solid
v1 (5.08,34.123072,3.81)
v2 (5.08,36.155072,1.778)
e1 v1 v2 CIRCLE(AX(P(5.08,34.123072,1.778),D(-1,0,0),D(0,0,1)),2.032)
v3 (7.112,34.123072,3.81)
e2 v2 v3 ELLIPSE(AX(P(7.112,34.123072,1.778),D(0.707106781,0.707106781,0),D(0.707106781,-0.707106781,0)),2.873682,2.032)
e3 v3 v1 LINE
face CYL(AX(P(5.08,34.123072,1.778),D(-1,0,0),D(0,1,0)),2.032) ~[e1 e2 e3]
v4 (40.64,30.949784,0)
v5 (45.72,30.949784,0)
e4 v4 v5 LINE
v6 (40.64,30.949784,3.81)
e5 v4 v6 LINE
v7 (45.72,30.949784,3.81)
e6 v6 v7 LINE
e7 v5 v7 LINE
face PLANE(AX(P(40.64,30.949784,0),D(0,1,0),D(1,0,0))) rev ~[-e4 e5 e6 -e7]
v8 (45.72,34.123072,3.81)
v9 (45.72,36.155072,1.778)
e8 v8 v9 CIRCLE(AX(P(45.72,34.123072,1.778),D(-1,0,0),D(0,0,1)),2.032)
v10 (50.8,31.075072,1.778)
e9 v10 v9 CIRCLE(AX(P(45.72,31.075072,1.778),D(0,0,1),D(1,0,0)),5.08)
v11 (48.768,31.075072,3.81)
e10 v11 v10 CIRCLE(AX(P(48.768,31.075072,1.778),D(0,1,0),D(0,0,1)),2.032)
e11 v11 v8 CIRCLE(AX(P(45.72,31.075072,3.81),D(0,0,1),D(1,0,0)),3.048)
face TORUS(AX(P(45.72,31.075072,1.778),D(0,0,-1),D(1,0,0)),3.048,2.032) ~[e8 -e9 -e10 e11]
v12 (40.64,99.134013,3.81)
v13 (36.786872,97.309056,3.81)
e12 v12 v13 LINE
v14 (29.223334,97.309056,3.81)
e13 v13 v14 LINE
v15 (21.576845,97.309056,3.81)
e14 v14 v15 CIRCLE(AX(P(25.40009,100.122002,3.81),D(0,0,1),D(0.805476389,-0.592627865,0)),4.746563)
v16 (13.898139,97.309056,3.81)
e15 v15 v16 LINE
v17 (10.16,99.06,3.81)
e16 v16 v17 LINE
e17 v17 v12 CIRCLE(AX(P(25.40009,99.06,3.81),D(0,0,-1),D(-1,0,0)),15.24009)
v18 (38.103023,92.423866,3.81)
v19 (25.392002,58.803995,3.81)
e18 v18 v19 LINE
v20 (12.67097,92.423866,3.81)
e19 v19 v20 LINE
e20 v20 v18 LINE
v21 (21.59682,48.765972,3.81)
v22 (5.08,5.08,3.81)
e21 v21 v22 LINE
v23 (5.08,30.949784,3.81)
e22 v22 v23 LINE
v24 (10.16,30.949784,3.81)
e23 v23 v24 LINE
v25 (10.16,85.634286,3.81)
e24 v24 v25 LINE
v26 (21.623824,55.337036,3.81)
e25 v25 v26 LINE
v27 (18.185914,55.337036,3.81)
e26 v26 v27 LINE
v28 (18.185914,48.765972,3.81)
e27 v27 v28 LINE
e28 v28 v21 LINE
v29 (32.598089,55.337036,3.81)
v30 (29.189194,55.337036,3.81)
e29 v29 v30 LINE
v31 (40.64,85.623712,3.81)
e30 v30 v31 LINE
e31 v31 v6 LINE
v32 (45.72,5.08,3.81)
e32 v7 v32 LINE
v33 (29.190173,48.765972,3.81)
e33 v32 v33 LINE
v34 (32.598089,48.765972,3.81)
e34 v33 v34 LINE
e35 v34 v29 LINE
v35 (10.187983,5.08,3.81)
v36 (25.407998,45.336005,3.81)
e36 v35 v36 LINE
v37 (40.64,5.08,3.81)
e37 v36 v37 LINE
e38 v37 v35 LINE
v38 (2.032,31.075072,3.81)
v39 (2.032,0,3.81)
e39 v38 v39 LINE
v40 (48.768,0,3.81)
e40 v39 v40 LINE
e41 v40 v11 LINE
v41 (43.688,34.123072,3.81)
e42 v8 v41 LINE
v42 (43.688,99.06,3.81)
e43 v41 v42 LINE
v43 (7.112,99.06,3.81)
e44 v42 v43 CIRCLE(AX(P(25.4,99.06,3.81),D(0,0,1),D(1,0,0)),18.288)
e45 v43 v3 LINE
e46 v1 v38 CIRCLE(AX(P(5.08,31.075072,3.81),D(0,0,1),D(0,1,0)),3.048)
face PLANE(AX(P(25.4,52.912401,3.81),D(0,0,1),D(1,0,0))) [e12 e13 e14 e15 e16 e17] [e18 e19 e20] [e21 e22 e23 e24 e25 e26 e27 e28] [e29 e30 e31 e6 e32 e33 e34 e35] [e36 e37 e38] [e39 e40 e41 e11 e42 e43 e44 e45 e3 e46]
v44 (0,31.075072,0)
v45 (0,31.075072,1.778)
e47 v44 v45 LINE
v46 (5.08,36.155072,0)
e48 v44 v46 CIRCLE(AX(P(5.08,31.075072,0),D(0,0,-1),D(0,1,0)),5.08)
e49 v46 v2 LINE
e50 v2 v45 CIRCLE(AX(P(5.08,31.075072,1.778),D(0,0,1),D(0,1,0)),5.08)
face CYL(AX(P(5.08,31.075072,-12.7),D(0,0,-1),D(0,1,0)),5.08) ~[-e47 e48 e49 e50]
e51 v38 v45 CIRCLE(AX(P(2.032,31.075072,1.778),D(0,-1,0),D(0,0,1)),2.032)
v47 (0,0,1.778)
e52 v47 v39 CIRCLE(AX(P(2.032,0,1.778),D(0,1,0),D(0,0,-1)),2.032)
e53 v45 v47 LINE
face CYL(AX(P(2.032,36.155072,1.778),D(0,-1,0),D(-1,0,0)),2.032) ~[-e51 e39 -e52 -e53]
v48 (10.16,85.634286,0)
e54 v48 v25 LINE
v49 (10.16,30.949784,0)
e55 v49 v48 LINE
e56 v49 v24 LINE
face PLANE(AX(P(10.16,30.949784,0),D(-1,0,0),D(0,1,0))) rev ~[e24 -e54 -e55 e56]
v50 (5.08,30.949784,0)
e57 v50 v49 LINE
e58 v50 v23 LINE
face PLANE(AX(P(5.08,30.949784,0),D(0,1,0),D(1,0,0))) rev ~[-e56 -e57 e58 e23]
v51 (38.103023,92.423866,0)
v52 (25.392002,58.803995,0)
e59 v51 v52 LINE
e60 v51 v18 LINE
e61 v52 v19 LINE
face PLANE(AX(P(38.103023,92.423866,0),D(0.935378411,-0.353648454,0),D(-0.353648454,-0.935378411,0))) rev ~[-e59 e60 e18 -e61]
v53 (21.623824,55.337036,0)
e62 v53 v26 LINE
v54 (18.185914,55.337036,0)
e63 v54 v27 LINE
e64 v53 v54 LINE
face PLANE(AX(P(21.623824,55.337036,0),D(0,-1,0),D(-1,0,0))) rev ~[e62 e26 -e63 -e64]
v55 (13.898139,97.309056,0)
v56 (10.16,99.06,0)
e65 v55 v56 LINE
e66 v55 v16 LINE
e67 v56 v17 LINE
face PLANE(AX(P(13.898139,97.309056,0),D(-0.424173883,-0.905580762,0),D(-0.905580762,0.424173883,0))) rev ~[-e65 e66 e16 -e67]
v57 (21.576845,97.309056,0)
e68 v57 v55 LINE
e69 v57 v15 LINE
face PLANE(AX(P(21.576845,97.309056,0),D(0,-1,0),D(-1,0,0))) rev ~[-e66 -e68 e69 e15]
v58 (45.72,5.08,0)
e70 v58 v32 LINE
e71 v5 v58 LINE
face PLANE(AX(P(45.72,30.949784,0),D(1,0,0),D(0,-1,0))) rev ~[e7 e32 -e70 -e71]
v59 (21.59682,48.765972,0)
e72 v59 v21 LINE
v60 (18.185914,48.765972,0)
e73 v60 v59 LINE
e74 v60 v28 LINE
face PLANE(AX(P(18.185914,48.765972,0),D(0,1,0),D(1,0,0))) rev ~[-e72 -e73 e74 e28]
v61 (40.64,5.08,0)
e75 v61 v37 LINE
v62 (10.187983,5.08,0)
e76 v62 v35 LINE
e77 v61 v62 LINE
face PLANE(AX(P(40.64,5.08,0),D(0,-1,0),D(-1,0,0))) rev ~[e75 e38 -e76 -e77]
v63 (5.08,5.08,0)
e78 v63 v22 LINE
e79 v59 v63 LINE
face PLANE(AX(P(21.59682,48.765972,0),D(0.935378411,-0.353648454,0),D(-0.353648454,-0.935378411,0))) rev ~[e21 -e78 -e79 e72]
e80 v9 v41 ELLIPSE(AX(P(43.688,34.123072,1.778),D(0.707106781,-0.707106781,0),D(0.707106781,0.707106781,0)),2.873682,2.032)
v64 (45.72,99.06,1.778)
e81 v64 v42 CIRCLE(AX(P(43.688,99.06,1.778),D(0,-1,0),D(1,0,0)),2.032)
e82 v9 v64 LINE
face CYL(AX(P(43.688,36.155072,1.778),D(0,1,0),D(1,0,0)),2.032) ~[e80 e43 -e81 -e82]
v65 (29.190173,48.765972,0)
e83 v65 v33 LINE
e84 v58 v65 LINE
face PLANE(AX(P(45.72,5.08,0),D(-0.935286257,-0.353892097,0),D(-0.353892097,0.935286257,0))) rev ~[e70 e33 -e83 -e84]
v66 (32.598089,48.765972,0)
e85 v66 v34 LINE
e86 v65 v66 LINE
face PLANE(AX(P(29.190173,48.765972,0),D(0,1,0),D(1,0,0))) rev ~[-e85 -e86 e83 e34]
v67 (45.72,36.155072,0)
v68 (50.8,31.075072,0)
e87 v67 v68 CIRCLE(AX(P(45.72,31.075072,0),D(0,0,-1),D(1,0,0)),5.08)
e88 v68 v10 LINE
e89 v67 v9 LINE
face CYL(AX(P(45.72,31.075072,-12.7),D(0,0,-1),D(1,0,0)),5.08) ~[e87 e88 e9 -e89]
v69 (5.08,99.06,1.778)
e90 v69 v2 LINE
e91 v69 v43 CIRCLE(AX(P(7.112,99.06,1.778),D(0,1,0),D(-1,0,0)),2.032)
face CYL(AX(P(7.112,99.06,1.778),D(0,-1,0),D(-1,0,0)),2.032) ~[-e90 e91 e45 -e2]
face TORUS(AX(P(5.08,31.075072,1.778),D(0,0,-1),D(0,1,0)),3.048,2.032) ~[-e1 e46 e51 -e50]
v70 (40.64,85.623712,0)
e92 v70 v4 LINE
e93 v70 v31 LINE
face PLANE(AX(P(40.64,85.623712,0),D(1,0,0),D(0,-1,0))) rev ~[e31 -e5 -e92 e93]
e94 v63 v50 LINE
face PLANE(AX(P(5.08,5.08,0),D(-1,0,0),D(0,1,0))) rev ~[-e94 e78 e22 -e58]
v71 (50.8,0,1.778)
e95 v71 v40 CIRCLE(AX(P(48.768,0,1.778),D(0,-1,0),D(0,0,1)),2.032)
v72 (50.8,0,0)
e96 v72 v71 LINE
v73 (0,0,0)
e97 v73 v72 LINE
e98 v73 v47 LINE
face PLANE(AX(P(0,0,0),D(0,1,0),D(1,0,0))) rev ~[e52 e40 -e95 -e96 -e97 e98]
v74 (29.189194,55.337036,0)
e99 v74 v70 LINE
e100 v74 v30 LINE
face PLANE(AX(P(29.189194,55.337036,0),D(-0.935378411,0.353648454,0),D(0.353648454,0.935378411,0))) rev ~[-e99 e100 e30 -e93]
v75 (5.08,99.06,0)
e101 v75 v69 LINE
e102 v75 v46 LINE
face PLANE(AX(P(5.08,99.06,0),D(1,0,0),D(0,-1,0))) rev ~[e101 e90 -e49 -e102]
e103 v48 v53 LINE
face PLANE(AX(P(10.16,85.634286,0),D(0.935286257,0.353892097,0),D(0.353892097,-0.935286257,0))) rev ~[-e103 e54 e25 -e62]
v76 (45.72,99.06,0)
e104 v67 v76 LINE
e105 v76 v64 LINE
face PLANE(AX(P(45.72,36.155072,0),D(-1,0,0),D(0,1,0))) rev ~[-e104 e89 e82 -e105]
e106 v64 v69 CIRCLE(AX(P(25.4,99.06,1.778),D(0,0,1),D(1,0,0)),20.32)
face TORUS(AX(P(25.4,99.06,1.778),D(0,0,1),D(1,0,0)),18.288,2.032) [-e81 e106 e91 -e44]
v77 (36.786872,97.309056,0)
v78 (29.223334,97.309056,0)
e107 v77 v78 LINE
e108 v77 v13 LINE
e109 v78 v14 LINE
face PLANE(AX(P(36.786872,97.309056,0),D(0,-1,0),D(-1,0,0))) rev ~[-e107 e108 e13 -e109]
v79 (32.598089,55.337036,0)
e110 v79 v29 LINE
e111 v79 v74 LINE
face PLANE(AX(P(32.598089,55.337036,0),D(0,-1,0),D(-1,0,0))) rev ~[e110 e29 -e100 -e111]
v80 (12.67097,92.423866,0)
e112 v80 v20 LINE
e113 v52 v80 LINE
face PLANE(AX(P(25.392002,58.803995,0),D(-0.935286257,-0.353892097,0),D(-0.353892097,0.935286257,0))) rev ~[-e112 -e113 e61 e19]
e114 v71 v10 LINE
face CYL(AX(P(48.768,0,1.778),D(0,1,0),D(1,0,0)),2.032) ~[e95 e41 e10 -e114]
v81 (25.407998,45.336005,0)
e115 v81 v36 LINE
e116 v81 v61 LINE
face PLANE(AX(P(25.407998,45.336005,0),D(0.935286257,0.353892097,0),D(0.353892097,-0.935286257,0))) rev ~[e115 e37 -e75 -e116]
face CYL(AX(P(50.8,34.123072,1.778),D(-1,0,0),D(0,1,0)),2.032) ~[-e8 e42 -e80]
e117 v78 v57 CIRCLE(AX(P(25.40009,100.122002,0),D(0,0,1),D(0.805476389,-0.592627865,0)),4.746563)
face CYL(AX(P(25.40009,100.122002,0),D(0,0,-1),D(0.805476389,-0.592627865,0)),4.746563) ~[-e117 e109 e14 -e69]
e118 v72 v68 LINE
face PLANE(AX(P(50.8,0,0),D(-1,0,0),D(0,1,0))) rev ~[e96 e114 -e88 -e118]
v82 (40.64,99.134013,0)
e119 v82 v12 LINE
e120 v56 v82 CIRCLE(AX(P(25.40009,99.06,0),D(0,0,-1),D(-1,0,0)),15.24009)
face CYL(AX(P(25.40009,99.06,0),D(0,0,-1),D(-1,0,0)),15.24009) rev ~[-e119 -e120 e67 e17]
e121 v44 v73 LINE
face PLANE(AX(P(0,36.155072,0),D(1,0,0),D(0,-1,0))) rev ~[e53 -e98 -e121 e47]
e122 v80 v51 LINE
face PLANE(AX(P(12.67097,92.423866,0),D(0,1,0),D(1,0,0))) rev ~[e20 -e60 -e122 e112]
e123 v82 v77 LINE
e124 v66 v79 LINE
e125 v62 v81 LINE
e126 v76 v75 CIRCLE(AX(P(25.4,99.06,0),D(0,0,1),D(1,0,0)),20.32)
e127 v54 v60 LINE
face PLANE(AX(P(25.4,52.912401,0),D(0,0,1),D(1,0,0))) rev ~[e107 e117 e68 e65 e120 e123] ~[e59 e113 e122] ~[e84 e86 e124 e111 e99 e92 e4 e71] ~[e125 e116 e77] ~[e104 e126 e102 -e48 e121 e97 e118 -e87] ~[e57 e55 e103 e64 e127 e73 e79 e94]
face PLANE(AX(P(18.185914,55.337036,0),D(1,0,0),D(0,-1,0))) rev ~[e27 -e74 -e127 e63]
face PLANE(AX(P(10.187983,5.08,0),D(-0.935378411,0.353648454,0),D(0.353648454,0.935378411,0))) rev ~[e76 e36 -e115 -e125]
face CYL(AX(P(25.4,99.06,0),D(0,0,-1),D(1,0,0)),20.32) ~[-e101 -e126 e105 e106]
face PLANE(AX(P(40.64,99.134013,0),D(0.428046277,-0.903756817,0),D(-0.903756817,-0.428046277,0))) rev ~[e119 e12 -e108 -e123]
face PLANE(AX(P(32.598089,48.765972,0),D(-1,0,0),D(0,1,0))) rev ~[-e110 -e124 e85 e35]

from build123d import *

# Parameters (mm, degrees)
F1_DEPTH     = 3.81
F2_R         = 2.032
F3_T3_ANGLE  = 90
F3_T6_ANGLE  = 90
F3_T9_DEPTH  = 16.51
F3_T12_DEPTH = 16.51


# Not quite as in the source:
# - a fillet or chamfer that OpenCascade refuses, or shapes differently, is made with other operations: its cross-section is extruded or revolved along the edge and cut away or added


with BuildPart() as f1:
    # F0 (on Top) → F1 (new body)
    with BuildSketch(Plane.XY):
        with BuildLine():
            Line((0, 36.1550717625), (0, 0))
            Line((0, 0), (50.8, 0))
            Line((50.8, 0), (50.8, 36.1550717625))
            Line((50.8, 36.1550717625), (45.72, 36.1550717625))
            Line((45.72, 36.1550717625), (45.72, 99.06))
            ThreePointArc((45.72, 99.06), (25.4, 119.38), (5.08, 99.06))
            Line((5.08, 99.06), (5.08, 36.1550717625))
            Line((5.08, 36.1550717625), (0, 36.1550717625))
        make_face()
        Polygon((21.5968196758, 48.7659722567), (5.08, 5.08), (5.08, 30.9497844428), (10.16, 30.9497844428), (10.16, 85.6342857143), (21.623824299, 55.3370357813), (18.1859140491, 55.3370357813), (18.1859140491, 48.7659722567), align=None, mode=Mode.SUBTRACT)
        Polygon((40.64, 5.08), (10.1879829027, 5.08), (25.4079982621, 45.3360045931), align=None, mode=Mode.SUBTRACT)
        Polygon((45.72, 30.9497844428), (45.72, 5.08), (29.1901726596, 48.7659722567), (32.5980894268, 48.7659722567), (32.5980894268, 55.3370357813), (29.1891943801, 55.3370357813), (40.64, 85.6237124205), (40.64, 30.9497844428), align=None, mode=Mode.SUBTRACT)
        Polygon((25.3920017379, 58.8039954069), (12.6709696314, 92.4238659741), (24.3276693245, 92.4238659741), (26.4725103977, 92.4238659741), (38.1030234, 92.4238659741), align=None, mode=Mode.SUBTRACT)
        with BuildLine():
            ThreePointArc((10.16, 99.06), (25.3630832236, 114.3000449305), (40.64, 99.1340130568))
            Line((40.64, 99.1340130568), (36.7868717318, 97.3090561919))
            Line((36.7868717318, 97.3090561919), (29.223334248, 97.3090561919))
            ThreePointArc((29.223334248, 97.3090561919), (25.4000898611, 104.8685646157), (21.5768454742, 97.3090561919))
            Line((21.5768454742, 97.3090561919), (13.8981392212, 97.3090561919))
            Line((13.8981392212, 97.3090561919), (10.16, 99.06))
        make_face(mode=Mode.SUBTRACT)
    extrude(amount=F1_DEPTH)

    # F2
    f2_edges = [f1.edges().sort_by_distance(p)[0] for p in [
        (45.72, 67.607536, 3.81),
        (50.8, 18.077536, 3.81),
        (48.26, 36.155072, 3.81),
        (2.54, 36.155072, 3.81),
        (0, 18.077536, 3.81),
    ]]
    fillet(f2_edges, radius=F2_R)

    # F3: fillet of radius 5.08 on 2 edges, made by hand


with BuildPart() as f3_tool1:
    # F3_s2 → F3_t3 (revolve)
    with BuildSketch(Plane.YZ.offset(5.08)):
        with BuildLine():
            ThreePointArc((34.1230717625, 3.81), (35.5599127419, 3.2148409794), (36.1550717625, 1.778))
            Line((36.1550717625, 1.778), (36.1550717625, 3.81))
            Line((36.1550717625, 3.81), (34.1230717625, 3.81))
        make_face()
    revolve(axis=Axis((5.08, 31.0750717625, 3.81), (0, 0, 1)), revolution_arc=F3_T3_ANGLE)


with BuildPart() as f3_tool4:
    # F3_s5 → F3_t6 (revolve)
    with BuildSketch(Plane.XZ.offset(-31.0750717625)):
        with BuildLine():
            ThreePointArc((48.768, 3.81), (50.2048409794, 3.2148409794), (50.8, 1.778))
            Line((50.8, 1.778), (50.8, 3.81))
            Line((50.8, 3.81), (48.768, 3.81))
        make_face()
    revolve(axis=Axis((45.72, 31.0750717625, 3.81), (0, 0, 1)), revolution_arc=F3_T6_ANGLE)


with BuildPart() as f3_tool7:
    # F3_s8 → F3_t9 (new body)
    with BuildSketch(Plane.XY.offset(-12.7)):
        with BuildLine():
            ThreePointArc((50.8, 31.0750717625), (49.3121024484, 34.667174211), (45.72, 36.1550717625))
            Line((45.72, 36.1550717625), (50.8, 36.1550717625))
            Line((50.8, 36.1550717625), (50.8, 31.0750717625))
        make_face()
    extrude(amount=F3_T9_DEPTH)


with BuildPart() as f3_tool10:
    # F3_s11 → F3_t12 (new body)
    with BuildSketch(Plane.XY.offset(-12.7)):
        with BuildLine():
            ThreePointArc((5.08, 36.1550717625), (1.4878975516, 34.667174211), (0, 31.0750717625))
            Line((0, 31.0750717625), (0, 36.1550717625))
            Line((0, 36.1550717625), (5.08, 36.1550717625))
        make_face()
    extrude(amount=F3_T12_DEPTH)


with BuildPart() as f1_1:
    add(f1.part)

    # F3_t13: cut F3_tool1, F3_tool4, F3_tool7, F3_tool10
    add([f3_tool1.part, f3_tool4.part, f3_tool7.part, f3_tool10.part], mode=Mode.SUBTRACT)


solid = f1_1.part
